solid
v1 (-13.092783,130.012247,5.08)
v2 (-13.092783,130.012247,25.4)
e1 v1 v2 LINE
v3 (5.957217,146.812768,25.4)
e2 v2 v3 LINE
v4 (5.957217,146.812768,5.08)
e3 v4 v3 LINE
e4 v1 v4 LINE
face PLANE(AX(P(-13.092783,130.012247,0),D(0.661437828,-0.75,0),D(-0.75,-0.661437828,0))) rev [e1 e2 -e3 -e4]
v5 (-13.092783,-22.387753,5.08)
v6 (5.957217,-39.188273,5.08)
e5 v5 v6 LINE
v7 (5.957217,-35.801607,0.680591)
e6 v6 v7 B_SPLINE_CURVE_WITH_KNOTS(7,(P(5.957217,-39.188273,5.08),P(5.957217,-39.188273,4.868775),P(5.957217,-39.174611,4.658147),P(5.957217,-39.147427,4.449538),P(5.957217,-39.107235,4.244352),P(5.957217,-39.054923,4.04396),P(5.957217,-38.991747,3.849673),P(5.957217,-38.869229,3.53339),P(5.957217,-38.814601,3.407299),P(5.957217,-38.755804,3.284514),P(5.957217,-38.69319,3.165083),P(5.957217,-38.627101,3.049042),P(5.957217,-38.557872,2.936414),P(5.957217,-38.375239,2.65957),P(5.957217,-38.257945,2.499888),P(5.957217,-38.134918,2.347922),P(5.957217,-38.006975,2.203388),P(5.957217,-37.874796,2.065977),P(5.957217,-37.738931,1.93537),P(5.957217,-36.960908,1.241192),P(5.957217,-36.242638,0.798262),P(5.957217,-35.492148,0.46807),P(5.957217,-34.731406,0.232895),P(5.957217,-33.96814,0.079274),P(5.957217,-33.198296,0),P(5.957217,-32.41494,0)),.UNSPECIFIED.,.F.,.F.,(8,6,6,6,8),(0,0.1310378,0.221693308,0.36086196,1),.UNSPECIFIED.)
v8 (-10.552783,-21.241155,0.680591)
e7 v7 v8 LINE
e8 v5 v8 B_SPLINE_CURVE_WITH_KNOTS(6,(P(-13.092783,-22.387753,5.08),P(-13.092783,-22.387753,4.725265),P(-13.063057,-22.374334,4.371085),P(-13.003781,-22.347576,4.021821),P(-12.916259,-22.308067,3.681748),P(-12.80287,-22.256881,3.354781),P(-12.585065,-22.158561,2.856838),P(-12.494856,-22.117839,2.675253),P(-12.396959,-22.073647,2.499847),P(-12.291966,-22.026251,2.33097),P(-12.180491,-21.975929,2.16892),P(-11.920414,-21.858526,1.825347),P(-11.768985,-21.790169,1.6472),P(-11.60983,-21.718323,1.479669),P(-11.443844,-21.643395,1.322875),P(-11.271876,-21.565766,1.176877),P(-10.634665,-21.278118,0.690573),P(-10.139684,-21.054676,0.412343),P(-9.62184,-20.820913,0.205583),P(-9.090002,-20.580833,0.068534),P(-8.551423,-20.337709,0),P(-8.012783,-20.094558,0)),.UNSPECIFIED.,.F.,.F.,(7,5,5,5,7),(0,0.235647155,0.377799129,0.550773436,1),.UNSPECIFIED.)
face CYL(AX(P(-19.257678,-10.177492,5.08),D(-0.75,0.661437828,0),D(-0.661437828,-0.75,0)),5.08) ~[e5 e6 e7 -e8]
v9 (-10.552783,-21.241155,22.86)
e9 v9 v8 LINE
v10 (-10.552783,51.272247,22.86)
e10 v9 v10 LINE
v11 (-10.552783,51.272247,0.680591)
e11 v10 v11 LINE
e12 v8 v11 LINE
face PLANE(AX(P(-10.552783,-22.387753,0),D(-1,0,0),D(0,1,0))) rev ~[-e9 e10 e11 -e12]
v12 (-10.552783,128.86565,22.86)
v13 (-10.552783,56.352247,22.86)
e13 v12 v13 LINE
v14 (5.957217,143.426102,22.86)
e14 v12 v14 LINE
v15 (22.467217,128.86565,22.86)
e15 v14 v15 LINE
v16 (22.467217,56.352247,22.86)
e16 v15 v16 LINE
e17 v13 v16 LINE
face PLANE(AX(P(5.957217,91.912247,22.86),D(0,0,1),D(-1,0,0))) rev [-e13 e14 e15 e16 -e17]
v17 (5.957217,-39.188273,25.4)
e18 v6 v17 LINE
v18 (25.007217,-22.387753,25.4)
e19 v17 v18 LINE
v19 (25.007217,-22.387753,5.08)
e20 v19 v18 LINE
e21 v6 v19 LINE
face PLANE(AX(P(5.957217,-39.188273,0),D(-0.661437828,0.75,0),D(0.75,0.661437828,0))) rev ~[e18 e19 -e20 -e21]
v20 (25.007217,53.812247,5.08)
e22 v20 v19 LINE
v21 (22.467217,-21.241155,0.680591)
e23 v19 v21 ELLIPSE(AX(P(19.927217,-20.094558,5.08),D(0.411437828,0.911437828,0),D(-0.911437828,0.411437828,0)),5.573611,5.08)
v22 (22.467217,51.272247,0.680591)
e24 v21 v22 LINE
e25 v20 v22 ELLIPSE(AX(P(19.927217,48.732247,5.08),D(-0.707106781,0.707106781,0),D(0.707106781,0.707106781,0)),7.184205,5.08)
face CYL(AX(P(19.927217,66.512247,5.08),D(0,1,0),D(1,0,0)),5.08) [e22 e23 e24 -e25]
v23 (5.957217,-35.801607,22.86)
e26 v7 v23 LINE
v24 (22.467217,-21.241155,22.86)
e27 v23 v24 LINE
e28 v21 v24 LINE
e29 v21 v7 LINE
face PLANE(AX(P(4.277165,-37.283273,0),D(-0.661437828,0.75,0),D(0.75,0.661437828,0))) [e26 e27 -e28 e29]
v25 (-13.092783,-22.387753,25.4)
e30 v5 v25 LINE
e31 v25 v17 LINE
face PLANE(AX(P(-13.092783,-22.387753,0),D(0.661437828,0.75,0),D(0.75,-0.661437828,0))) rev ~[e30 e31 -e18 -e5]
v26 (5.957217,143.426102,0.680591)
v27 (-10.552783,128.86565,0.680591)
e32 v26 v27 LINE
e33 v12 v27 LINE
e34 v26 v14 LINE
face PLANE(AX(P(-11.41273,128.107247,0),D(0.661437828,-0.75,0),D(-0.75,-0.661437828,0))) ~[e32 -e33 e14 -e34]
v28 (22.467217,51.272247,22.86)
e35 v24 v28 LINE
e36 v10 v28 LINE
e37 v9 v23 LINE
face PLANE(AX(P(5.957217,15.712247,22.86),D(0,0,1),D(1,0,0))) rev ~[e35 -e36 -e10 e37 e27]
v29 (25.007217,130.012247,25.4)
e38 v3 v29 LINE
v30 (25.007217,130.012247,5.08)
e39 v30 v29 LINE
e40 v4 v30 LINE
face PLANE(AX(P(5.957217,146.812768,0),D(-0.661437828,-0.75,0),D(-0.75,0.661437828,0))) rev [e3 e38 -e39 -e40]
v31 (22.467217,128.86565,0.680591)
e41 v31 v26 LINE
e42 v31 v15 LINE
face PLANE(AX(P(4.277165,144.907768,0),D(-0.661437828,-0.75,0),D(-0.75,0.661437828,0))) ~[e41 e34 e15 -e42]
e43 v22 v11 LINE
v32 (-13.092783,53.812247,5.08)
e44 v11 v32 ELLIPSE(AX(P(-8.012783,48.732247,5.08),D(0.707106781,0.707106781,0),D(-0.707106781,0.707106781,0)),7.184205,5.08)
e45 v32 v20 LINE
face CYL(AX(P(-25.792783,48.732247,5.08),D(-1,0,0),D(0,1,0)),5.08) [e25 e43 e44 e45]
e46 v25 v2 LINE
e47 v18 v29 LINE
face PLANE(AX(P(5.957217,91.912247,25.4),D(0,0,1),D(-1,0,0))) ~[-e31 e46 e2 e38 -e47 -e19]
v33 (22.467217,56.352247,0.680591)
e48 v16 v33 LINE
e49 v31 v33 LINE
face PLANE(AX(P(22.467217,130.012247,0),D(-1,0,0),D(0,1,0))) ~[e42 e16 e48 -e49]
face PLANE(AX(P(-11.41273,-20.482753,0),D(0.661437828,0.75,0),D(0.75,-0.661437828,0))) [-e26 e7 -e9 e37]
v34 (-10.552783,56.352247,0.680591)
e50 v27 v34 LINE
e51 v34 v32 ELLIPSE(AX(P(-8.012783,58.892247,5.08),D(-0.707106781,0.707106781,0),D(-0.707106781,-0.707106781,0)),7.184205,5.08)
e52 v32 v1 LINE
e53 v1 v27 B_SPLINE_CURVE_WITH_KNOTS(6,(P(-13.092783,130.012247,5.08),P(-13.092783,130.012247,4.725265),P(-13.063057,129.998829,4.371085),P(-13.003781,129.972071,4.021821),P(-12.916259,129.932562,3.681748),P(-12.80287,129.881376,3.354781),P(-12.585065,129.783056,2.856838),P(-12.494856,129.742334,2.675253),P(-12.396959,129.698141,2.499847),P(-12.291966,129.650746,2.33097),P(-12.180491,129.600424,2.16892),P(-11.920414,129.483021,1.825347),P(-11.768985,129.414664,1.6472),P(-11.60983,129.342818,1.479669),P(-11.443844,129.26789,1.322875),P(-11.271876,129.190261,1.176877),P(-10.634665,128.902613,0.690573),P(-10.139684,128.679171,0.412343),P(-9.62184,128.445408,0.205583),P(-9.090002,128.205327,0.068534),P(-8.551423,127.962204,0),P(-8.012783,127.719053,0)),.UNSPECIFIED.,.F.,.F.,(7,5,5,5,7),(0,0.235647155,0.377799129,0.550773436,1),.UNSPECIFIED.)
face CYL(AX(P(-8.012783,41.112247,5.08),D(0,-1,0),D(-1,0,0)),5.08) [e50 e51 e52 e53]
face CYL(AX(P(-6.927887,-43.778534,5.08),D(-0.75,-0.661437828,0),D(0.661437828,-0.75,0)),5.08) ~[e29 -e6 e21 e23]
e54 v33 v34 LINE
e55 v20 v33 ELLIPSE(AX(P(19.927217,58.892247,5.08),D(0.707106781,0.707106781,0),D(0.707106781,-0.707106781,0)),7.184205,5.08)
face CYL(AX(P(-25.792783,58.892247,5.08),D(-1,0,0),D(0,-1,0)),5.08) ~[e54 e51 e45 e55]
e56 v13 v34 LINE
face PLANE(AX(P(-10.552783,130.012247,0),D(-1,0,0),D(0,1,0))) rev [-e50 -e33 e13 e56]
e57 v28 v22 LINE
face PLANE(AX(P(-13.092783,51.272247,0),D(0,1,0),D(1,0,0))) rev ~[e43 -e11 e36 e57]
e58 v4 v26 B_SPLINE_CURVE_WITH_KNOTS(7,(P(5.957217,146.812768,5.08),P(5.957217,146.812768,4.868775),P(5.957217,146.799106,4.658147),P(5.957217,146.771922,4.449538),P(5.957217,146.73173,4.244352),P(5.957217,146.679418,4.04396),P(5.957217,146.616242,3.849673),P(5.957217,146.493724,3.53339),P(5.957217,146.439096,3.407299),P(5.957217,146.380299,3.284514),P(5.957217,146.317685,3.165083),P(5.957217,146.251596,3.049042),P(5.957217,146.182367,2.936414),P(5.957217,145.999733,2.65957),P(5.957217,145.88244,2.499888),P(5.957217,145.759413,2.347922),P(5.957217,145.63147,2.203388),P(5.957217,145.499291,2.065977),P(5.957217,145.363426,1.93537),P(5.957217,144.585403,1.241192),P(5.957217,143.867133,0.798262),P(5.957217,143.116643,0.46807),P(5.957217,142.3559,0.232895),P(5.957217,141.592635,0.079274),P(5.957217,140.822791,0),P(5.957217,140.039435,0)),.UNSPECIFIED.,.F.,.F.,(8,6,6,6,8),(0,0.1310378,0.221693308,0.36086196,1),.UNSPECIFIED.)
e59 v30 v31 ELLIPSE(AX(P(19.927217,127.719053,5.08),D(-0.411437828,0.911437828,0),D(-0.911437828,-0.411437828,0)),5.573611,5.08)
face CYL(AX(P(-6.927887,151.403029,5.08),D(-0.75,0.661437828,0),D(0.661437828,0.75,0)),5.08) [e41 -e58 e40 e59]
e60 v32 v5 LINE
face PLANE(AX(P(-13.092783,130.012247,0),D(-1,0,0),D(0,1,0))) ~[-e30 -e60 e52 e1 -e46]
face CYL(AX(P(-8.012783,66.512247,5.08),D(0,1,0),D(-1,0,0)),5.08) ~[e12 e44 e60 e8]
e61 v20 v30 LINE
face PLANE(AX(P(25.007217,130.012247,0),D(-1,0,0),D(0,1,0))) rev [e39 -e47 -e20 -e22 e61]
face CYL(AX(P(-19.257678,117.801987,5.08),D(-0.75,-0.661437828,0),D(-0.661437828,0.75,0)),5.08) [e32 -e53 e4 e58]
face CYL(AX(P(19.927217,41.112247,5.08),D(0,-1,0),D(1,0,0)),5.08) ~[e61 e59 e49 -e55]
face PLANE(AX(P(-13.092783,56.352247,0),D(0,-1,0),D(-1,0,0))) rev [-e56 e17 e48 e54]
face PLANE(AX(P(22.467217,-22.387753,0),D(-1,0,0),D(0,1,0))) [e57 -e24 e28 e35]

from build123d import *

# Parameters (mm, degrees)
F1_DEPTH    = 25.4
F0_W        = 38.1
F0_H        = 76.2
F2_DEPTH    = 25.4
F3_T        = -2.54
F4_T1_DEPTH = 101.6
F4_T3_DEPTH = 50.8
F4_T5_DEPTH = 50.8
F4_T7_DEPTH = 63.5


# Not quite as in the source:
# - a fillet or chamfer that OpenCascade refuses, or shapes differently, is made with other operations: its cross-section is extruded or revolved along the edge and cut away or added


with BuildPart() as f1:
    # F0 (on Top) → F1 (new body)
    with BuildSketch(Plane.XY):
        Polygon((25.0072174214, -22.3877525396), (-13.0927825786, -22.3877525396), (5.9572174214, -39.1882733649), align=None)
    extrude(amount=F1_DEPTH)

    # F0 (on Top) → F2 (join)
    with BuildSketch(Plane.XY):
        with Locations((5.9572174214, 15.7122474604)):
            Rectangle(F0_W, F0_H)
    extrude(amount=F2_DEPTH)

    # F3
    f3_openings = [f1.faces().sort_by_distance(p)[0] for p in [
        (5.957217, 11.373102, 0),
    ]]
    offset(amount=F3_T, openings=f3_openings)

    # F4: fillet of radius 5.08 on 5 edges, made by hand

    # F4_s2 → F4_t1 (cut)
    with BuildSketch(Plane.XZ.offset(-66.5122474604)):
        with BuildLine():
            ThreePointArc((25.0072174214, 5.08), (23.5193198698, 1.4878975516), (19.9272174214, 0))
            Line((19.9272174214, 0), (25.0072174214, 0))
            Line((25.0072174214, 0), (25.0072174214, 5.08))
        make_face()
        with BuildLine():
            ThreePointArc((-13.0927825786, 5.08), (-11.604885027, 1.4878975516), (-8.0127825786, 0))
            Line((-8.0127825786, 0), (-13.0927825786, 0))
            Line((-13.0927825786, 0), (-13.0927825786, 5.08))
        make_face()
    extrude(amount=F4_T1_DEPTH, mode=Mode.SUBTRACT)

    # F4_s4 → F4_t3 (cut)
    with BuildSketch(Plane(origin=(-25.6145200068, -22.5898832967, 0), x_dir=(0, 0, 1), z_dir=(0.75, 0.6614378278, 0))):
        with BuildLine():
            ThreePointArc((5.08, 33.3315339744), (1.4878975516, 31.8436364228), (0, 28.2515339744))
            Line((0, 28.2515339744), (0, 33.3315339744))
            Line((0, 33.3315339744), (5.08, 33.3315339744))
        make_face()
    extrude(amount=F4_T3_DEPTH, mode=Mode.SUBTRACT)

    # F4_s6 → F4_t5 (cut)
    with BuildSketch(Plane(origin=(-5.7836103942, 5.1006649277, 0), x_dir=(0, 0, 1), z_dir=(0.75, -0.6614378278, 0))):
        with BuildLine():
            ThreePointArc((5.08, 25.4508760729), (1.4878975516, 23.9629785214), (0, 20.3708760729))
            Line((0, 20.3708760729), (0, 25.4508760729))
            Line((0, 25.4508760729), (5.08, 25.4508760729))
        make_face()
    extrude(amount=F4_T5_DEPTH, mode=Mode.SUBTRACT)

    # F4_s8 → F4_t7 (cut)
    with BuildSketch(Plane.YZ.offset(-25.7927825786)):
        with BuildLine():
            ThreePointArc((53.8122474604, 5.08), (52.3243499088, 1.4878975516), (48.7322474604, 0))
            Line((48.7322474604, 0), (53.8122474604, 0))
            Line((53.8122474604, 0), (53.8122474604, 5.08))
        make_face()
    extrude(amount=F4_T7_DEPTH, mode=Mode.SUBTRACT)

    # F5: F1 across face


with BuildPart() as f1_1:
    add(f1.part)
    add(f1.part.mirror(Plane(origin=(5.9572174214, 53.8122474604, 15.24), x_dir=(-1, 0, 0), z_dir=(0, 1, 0))))


solid = f1_1.part
